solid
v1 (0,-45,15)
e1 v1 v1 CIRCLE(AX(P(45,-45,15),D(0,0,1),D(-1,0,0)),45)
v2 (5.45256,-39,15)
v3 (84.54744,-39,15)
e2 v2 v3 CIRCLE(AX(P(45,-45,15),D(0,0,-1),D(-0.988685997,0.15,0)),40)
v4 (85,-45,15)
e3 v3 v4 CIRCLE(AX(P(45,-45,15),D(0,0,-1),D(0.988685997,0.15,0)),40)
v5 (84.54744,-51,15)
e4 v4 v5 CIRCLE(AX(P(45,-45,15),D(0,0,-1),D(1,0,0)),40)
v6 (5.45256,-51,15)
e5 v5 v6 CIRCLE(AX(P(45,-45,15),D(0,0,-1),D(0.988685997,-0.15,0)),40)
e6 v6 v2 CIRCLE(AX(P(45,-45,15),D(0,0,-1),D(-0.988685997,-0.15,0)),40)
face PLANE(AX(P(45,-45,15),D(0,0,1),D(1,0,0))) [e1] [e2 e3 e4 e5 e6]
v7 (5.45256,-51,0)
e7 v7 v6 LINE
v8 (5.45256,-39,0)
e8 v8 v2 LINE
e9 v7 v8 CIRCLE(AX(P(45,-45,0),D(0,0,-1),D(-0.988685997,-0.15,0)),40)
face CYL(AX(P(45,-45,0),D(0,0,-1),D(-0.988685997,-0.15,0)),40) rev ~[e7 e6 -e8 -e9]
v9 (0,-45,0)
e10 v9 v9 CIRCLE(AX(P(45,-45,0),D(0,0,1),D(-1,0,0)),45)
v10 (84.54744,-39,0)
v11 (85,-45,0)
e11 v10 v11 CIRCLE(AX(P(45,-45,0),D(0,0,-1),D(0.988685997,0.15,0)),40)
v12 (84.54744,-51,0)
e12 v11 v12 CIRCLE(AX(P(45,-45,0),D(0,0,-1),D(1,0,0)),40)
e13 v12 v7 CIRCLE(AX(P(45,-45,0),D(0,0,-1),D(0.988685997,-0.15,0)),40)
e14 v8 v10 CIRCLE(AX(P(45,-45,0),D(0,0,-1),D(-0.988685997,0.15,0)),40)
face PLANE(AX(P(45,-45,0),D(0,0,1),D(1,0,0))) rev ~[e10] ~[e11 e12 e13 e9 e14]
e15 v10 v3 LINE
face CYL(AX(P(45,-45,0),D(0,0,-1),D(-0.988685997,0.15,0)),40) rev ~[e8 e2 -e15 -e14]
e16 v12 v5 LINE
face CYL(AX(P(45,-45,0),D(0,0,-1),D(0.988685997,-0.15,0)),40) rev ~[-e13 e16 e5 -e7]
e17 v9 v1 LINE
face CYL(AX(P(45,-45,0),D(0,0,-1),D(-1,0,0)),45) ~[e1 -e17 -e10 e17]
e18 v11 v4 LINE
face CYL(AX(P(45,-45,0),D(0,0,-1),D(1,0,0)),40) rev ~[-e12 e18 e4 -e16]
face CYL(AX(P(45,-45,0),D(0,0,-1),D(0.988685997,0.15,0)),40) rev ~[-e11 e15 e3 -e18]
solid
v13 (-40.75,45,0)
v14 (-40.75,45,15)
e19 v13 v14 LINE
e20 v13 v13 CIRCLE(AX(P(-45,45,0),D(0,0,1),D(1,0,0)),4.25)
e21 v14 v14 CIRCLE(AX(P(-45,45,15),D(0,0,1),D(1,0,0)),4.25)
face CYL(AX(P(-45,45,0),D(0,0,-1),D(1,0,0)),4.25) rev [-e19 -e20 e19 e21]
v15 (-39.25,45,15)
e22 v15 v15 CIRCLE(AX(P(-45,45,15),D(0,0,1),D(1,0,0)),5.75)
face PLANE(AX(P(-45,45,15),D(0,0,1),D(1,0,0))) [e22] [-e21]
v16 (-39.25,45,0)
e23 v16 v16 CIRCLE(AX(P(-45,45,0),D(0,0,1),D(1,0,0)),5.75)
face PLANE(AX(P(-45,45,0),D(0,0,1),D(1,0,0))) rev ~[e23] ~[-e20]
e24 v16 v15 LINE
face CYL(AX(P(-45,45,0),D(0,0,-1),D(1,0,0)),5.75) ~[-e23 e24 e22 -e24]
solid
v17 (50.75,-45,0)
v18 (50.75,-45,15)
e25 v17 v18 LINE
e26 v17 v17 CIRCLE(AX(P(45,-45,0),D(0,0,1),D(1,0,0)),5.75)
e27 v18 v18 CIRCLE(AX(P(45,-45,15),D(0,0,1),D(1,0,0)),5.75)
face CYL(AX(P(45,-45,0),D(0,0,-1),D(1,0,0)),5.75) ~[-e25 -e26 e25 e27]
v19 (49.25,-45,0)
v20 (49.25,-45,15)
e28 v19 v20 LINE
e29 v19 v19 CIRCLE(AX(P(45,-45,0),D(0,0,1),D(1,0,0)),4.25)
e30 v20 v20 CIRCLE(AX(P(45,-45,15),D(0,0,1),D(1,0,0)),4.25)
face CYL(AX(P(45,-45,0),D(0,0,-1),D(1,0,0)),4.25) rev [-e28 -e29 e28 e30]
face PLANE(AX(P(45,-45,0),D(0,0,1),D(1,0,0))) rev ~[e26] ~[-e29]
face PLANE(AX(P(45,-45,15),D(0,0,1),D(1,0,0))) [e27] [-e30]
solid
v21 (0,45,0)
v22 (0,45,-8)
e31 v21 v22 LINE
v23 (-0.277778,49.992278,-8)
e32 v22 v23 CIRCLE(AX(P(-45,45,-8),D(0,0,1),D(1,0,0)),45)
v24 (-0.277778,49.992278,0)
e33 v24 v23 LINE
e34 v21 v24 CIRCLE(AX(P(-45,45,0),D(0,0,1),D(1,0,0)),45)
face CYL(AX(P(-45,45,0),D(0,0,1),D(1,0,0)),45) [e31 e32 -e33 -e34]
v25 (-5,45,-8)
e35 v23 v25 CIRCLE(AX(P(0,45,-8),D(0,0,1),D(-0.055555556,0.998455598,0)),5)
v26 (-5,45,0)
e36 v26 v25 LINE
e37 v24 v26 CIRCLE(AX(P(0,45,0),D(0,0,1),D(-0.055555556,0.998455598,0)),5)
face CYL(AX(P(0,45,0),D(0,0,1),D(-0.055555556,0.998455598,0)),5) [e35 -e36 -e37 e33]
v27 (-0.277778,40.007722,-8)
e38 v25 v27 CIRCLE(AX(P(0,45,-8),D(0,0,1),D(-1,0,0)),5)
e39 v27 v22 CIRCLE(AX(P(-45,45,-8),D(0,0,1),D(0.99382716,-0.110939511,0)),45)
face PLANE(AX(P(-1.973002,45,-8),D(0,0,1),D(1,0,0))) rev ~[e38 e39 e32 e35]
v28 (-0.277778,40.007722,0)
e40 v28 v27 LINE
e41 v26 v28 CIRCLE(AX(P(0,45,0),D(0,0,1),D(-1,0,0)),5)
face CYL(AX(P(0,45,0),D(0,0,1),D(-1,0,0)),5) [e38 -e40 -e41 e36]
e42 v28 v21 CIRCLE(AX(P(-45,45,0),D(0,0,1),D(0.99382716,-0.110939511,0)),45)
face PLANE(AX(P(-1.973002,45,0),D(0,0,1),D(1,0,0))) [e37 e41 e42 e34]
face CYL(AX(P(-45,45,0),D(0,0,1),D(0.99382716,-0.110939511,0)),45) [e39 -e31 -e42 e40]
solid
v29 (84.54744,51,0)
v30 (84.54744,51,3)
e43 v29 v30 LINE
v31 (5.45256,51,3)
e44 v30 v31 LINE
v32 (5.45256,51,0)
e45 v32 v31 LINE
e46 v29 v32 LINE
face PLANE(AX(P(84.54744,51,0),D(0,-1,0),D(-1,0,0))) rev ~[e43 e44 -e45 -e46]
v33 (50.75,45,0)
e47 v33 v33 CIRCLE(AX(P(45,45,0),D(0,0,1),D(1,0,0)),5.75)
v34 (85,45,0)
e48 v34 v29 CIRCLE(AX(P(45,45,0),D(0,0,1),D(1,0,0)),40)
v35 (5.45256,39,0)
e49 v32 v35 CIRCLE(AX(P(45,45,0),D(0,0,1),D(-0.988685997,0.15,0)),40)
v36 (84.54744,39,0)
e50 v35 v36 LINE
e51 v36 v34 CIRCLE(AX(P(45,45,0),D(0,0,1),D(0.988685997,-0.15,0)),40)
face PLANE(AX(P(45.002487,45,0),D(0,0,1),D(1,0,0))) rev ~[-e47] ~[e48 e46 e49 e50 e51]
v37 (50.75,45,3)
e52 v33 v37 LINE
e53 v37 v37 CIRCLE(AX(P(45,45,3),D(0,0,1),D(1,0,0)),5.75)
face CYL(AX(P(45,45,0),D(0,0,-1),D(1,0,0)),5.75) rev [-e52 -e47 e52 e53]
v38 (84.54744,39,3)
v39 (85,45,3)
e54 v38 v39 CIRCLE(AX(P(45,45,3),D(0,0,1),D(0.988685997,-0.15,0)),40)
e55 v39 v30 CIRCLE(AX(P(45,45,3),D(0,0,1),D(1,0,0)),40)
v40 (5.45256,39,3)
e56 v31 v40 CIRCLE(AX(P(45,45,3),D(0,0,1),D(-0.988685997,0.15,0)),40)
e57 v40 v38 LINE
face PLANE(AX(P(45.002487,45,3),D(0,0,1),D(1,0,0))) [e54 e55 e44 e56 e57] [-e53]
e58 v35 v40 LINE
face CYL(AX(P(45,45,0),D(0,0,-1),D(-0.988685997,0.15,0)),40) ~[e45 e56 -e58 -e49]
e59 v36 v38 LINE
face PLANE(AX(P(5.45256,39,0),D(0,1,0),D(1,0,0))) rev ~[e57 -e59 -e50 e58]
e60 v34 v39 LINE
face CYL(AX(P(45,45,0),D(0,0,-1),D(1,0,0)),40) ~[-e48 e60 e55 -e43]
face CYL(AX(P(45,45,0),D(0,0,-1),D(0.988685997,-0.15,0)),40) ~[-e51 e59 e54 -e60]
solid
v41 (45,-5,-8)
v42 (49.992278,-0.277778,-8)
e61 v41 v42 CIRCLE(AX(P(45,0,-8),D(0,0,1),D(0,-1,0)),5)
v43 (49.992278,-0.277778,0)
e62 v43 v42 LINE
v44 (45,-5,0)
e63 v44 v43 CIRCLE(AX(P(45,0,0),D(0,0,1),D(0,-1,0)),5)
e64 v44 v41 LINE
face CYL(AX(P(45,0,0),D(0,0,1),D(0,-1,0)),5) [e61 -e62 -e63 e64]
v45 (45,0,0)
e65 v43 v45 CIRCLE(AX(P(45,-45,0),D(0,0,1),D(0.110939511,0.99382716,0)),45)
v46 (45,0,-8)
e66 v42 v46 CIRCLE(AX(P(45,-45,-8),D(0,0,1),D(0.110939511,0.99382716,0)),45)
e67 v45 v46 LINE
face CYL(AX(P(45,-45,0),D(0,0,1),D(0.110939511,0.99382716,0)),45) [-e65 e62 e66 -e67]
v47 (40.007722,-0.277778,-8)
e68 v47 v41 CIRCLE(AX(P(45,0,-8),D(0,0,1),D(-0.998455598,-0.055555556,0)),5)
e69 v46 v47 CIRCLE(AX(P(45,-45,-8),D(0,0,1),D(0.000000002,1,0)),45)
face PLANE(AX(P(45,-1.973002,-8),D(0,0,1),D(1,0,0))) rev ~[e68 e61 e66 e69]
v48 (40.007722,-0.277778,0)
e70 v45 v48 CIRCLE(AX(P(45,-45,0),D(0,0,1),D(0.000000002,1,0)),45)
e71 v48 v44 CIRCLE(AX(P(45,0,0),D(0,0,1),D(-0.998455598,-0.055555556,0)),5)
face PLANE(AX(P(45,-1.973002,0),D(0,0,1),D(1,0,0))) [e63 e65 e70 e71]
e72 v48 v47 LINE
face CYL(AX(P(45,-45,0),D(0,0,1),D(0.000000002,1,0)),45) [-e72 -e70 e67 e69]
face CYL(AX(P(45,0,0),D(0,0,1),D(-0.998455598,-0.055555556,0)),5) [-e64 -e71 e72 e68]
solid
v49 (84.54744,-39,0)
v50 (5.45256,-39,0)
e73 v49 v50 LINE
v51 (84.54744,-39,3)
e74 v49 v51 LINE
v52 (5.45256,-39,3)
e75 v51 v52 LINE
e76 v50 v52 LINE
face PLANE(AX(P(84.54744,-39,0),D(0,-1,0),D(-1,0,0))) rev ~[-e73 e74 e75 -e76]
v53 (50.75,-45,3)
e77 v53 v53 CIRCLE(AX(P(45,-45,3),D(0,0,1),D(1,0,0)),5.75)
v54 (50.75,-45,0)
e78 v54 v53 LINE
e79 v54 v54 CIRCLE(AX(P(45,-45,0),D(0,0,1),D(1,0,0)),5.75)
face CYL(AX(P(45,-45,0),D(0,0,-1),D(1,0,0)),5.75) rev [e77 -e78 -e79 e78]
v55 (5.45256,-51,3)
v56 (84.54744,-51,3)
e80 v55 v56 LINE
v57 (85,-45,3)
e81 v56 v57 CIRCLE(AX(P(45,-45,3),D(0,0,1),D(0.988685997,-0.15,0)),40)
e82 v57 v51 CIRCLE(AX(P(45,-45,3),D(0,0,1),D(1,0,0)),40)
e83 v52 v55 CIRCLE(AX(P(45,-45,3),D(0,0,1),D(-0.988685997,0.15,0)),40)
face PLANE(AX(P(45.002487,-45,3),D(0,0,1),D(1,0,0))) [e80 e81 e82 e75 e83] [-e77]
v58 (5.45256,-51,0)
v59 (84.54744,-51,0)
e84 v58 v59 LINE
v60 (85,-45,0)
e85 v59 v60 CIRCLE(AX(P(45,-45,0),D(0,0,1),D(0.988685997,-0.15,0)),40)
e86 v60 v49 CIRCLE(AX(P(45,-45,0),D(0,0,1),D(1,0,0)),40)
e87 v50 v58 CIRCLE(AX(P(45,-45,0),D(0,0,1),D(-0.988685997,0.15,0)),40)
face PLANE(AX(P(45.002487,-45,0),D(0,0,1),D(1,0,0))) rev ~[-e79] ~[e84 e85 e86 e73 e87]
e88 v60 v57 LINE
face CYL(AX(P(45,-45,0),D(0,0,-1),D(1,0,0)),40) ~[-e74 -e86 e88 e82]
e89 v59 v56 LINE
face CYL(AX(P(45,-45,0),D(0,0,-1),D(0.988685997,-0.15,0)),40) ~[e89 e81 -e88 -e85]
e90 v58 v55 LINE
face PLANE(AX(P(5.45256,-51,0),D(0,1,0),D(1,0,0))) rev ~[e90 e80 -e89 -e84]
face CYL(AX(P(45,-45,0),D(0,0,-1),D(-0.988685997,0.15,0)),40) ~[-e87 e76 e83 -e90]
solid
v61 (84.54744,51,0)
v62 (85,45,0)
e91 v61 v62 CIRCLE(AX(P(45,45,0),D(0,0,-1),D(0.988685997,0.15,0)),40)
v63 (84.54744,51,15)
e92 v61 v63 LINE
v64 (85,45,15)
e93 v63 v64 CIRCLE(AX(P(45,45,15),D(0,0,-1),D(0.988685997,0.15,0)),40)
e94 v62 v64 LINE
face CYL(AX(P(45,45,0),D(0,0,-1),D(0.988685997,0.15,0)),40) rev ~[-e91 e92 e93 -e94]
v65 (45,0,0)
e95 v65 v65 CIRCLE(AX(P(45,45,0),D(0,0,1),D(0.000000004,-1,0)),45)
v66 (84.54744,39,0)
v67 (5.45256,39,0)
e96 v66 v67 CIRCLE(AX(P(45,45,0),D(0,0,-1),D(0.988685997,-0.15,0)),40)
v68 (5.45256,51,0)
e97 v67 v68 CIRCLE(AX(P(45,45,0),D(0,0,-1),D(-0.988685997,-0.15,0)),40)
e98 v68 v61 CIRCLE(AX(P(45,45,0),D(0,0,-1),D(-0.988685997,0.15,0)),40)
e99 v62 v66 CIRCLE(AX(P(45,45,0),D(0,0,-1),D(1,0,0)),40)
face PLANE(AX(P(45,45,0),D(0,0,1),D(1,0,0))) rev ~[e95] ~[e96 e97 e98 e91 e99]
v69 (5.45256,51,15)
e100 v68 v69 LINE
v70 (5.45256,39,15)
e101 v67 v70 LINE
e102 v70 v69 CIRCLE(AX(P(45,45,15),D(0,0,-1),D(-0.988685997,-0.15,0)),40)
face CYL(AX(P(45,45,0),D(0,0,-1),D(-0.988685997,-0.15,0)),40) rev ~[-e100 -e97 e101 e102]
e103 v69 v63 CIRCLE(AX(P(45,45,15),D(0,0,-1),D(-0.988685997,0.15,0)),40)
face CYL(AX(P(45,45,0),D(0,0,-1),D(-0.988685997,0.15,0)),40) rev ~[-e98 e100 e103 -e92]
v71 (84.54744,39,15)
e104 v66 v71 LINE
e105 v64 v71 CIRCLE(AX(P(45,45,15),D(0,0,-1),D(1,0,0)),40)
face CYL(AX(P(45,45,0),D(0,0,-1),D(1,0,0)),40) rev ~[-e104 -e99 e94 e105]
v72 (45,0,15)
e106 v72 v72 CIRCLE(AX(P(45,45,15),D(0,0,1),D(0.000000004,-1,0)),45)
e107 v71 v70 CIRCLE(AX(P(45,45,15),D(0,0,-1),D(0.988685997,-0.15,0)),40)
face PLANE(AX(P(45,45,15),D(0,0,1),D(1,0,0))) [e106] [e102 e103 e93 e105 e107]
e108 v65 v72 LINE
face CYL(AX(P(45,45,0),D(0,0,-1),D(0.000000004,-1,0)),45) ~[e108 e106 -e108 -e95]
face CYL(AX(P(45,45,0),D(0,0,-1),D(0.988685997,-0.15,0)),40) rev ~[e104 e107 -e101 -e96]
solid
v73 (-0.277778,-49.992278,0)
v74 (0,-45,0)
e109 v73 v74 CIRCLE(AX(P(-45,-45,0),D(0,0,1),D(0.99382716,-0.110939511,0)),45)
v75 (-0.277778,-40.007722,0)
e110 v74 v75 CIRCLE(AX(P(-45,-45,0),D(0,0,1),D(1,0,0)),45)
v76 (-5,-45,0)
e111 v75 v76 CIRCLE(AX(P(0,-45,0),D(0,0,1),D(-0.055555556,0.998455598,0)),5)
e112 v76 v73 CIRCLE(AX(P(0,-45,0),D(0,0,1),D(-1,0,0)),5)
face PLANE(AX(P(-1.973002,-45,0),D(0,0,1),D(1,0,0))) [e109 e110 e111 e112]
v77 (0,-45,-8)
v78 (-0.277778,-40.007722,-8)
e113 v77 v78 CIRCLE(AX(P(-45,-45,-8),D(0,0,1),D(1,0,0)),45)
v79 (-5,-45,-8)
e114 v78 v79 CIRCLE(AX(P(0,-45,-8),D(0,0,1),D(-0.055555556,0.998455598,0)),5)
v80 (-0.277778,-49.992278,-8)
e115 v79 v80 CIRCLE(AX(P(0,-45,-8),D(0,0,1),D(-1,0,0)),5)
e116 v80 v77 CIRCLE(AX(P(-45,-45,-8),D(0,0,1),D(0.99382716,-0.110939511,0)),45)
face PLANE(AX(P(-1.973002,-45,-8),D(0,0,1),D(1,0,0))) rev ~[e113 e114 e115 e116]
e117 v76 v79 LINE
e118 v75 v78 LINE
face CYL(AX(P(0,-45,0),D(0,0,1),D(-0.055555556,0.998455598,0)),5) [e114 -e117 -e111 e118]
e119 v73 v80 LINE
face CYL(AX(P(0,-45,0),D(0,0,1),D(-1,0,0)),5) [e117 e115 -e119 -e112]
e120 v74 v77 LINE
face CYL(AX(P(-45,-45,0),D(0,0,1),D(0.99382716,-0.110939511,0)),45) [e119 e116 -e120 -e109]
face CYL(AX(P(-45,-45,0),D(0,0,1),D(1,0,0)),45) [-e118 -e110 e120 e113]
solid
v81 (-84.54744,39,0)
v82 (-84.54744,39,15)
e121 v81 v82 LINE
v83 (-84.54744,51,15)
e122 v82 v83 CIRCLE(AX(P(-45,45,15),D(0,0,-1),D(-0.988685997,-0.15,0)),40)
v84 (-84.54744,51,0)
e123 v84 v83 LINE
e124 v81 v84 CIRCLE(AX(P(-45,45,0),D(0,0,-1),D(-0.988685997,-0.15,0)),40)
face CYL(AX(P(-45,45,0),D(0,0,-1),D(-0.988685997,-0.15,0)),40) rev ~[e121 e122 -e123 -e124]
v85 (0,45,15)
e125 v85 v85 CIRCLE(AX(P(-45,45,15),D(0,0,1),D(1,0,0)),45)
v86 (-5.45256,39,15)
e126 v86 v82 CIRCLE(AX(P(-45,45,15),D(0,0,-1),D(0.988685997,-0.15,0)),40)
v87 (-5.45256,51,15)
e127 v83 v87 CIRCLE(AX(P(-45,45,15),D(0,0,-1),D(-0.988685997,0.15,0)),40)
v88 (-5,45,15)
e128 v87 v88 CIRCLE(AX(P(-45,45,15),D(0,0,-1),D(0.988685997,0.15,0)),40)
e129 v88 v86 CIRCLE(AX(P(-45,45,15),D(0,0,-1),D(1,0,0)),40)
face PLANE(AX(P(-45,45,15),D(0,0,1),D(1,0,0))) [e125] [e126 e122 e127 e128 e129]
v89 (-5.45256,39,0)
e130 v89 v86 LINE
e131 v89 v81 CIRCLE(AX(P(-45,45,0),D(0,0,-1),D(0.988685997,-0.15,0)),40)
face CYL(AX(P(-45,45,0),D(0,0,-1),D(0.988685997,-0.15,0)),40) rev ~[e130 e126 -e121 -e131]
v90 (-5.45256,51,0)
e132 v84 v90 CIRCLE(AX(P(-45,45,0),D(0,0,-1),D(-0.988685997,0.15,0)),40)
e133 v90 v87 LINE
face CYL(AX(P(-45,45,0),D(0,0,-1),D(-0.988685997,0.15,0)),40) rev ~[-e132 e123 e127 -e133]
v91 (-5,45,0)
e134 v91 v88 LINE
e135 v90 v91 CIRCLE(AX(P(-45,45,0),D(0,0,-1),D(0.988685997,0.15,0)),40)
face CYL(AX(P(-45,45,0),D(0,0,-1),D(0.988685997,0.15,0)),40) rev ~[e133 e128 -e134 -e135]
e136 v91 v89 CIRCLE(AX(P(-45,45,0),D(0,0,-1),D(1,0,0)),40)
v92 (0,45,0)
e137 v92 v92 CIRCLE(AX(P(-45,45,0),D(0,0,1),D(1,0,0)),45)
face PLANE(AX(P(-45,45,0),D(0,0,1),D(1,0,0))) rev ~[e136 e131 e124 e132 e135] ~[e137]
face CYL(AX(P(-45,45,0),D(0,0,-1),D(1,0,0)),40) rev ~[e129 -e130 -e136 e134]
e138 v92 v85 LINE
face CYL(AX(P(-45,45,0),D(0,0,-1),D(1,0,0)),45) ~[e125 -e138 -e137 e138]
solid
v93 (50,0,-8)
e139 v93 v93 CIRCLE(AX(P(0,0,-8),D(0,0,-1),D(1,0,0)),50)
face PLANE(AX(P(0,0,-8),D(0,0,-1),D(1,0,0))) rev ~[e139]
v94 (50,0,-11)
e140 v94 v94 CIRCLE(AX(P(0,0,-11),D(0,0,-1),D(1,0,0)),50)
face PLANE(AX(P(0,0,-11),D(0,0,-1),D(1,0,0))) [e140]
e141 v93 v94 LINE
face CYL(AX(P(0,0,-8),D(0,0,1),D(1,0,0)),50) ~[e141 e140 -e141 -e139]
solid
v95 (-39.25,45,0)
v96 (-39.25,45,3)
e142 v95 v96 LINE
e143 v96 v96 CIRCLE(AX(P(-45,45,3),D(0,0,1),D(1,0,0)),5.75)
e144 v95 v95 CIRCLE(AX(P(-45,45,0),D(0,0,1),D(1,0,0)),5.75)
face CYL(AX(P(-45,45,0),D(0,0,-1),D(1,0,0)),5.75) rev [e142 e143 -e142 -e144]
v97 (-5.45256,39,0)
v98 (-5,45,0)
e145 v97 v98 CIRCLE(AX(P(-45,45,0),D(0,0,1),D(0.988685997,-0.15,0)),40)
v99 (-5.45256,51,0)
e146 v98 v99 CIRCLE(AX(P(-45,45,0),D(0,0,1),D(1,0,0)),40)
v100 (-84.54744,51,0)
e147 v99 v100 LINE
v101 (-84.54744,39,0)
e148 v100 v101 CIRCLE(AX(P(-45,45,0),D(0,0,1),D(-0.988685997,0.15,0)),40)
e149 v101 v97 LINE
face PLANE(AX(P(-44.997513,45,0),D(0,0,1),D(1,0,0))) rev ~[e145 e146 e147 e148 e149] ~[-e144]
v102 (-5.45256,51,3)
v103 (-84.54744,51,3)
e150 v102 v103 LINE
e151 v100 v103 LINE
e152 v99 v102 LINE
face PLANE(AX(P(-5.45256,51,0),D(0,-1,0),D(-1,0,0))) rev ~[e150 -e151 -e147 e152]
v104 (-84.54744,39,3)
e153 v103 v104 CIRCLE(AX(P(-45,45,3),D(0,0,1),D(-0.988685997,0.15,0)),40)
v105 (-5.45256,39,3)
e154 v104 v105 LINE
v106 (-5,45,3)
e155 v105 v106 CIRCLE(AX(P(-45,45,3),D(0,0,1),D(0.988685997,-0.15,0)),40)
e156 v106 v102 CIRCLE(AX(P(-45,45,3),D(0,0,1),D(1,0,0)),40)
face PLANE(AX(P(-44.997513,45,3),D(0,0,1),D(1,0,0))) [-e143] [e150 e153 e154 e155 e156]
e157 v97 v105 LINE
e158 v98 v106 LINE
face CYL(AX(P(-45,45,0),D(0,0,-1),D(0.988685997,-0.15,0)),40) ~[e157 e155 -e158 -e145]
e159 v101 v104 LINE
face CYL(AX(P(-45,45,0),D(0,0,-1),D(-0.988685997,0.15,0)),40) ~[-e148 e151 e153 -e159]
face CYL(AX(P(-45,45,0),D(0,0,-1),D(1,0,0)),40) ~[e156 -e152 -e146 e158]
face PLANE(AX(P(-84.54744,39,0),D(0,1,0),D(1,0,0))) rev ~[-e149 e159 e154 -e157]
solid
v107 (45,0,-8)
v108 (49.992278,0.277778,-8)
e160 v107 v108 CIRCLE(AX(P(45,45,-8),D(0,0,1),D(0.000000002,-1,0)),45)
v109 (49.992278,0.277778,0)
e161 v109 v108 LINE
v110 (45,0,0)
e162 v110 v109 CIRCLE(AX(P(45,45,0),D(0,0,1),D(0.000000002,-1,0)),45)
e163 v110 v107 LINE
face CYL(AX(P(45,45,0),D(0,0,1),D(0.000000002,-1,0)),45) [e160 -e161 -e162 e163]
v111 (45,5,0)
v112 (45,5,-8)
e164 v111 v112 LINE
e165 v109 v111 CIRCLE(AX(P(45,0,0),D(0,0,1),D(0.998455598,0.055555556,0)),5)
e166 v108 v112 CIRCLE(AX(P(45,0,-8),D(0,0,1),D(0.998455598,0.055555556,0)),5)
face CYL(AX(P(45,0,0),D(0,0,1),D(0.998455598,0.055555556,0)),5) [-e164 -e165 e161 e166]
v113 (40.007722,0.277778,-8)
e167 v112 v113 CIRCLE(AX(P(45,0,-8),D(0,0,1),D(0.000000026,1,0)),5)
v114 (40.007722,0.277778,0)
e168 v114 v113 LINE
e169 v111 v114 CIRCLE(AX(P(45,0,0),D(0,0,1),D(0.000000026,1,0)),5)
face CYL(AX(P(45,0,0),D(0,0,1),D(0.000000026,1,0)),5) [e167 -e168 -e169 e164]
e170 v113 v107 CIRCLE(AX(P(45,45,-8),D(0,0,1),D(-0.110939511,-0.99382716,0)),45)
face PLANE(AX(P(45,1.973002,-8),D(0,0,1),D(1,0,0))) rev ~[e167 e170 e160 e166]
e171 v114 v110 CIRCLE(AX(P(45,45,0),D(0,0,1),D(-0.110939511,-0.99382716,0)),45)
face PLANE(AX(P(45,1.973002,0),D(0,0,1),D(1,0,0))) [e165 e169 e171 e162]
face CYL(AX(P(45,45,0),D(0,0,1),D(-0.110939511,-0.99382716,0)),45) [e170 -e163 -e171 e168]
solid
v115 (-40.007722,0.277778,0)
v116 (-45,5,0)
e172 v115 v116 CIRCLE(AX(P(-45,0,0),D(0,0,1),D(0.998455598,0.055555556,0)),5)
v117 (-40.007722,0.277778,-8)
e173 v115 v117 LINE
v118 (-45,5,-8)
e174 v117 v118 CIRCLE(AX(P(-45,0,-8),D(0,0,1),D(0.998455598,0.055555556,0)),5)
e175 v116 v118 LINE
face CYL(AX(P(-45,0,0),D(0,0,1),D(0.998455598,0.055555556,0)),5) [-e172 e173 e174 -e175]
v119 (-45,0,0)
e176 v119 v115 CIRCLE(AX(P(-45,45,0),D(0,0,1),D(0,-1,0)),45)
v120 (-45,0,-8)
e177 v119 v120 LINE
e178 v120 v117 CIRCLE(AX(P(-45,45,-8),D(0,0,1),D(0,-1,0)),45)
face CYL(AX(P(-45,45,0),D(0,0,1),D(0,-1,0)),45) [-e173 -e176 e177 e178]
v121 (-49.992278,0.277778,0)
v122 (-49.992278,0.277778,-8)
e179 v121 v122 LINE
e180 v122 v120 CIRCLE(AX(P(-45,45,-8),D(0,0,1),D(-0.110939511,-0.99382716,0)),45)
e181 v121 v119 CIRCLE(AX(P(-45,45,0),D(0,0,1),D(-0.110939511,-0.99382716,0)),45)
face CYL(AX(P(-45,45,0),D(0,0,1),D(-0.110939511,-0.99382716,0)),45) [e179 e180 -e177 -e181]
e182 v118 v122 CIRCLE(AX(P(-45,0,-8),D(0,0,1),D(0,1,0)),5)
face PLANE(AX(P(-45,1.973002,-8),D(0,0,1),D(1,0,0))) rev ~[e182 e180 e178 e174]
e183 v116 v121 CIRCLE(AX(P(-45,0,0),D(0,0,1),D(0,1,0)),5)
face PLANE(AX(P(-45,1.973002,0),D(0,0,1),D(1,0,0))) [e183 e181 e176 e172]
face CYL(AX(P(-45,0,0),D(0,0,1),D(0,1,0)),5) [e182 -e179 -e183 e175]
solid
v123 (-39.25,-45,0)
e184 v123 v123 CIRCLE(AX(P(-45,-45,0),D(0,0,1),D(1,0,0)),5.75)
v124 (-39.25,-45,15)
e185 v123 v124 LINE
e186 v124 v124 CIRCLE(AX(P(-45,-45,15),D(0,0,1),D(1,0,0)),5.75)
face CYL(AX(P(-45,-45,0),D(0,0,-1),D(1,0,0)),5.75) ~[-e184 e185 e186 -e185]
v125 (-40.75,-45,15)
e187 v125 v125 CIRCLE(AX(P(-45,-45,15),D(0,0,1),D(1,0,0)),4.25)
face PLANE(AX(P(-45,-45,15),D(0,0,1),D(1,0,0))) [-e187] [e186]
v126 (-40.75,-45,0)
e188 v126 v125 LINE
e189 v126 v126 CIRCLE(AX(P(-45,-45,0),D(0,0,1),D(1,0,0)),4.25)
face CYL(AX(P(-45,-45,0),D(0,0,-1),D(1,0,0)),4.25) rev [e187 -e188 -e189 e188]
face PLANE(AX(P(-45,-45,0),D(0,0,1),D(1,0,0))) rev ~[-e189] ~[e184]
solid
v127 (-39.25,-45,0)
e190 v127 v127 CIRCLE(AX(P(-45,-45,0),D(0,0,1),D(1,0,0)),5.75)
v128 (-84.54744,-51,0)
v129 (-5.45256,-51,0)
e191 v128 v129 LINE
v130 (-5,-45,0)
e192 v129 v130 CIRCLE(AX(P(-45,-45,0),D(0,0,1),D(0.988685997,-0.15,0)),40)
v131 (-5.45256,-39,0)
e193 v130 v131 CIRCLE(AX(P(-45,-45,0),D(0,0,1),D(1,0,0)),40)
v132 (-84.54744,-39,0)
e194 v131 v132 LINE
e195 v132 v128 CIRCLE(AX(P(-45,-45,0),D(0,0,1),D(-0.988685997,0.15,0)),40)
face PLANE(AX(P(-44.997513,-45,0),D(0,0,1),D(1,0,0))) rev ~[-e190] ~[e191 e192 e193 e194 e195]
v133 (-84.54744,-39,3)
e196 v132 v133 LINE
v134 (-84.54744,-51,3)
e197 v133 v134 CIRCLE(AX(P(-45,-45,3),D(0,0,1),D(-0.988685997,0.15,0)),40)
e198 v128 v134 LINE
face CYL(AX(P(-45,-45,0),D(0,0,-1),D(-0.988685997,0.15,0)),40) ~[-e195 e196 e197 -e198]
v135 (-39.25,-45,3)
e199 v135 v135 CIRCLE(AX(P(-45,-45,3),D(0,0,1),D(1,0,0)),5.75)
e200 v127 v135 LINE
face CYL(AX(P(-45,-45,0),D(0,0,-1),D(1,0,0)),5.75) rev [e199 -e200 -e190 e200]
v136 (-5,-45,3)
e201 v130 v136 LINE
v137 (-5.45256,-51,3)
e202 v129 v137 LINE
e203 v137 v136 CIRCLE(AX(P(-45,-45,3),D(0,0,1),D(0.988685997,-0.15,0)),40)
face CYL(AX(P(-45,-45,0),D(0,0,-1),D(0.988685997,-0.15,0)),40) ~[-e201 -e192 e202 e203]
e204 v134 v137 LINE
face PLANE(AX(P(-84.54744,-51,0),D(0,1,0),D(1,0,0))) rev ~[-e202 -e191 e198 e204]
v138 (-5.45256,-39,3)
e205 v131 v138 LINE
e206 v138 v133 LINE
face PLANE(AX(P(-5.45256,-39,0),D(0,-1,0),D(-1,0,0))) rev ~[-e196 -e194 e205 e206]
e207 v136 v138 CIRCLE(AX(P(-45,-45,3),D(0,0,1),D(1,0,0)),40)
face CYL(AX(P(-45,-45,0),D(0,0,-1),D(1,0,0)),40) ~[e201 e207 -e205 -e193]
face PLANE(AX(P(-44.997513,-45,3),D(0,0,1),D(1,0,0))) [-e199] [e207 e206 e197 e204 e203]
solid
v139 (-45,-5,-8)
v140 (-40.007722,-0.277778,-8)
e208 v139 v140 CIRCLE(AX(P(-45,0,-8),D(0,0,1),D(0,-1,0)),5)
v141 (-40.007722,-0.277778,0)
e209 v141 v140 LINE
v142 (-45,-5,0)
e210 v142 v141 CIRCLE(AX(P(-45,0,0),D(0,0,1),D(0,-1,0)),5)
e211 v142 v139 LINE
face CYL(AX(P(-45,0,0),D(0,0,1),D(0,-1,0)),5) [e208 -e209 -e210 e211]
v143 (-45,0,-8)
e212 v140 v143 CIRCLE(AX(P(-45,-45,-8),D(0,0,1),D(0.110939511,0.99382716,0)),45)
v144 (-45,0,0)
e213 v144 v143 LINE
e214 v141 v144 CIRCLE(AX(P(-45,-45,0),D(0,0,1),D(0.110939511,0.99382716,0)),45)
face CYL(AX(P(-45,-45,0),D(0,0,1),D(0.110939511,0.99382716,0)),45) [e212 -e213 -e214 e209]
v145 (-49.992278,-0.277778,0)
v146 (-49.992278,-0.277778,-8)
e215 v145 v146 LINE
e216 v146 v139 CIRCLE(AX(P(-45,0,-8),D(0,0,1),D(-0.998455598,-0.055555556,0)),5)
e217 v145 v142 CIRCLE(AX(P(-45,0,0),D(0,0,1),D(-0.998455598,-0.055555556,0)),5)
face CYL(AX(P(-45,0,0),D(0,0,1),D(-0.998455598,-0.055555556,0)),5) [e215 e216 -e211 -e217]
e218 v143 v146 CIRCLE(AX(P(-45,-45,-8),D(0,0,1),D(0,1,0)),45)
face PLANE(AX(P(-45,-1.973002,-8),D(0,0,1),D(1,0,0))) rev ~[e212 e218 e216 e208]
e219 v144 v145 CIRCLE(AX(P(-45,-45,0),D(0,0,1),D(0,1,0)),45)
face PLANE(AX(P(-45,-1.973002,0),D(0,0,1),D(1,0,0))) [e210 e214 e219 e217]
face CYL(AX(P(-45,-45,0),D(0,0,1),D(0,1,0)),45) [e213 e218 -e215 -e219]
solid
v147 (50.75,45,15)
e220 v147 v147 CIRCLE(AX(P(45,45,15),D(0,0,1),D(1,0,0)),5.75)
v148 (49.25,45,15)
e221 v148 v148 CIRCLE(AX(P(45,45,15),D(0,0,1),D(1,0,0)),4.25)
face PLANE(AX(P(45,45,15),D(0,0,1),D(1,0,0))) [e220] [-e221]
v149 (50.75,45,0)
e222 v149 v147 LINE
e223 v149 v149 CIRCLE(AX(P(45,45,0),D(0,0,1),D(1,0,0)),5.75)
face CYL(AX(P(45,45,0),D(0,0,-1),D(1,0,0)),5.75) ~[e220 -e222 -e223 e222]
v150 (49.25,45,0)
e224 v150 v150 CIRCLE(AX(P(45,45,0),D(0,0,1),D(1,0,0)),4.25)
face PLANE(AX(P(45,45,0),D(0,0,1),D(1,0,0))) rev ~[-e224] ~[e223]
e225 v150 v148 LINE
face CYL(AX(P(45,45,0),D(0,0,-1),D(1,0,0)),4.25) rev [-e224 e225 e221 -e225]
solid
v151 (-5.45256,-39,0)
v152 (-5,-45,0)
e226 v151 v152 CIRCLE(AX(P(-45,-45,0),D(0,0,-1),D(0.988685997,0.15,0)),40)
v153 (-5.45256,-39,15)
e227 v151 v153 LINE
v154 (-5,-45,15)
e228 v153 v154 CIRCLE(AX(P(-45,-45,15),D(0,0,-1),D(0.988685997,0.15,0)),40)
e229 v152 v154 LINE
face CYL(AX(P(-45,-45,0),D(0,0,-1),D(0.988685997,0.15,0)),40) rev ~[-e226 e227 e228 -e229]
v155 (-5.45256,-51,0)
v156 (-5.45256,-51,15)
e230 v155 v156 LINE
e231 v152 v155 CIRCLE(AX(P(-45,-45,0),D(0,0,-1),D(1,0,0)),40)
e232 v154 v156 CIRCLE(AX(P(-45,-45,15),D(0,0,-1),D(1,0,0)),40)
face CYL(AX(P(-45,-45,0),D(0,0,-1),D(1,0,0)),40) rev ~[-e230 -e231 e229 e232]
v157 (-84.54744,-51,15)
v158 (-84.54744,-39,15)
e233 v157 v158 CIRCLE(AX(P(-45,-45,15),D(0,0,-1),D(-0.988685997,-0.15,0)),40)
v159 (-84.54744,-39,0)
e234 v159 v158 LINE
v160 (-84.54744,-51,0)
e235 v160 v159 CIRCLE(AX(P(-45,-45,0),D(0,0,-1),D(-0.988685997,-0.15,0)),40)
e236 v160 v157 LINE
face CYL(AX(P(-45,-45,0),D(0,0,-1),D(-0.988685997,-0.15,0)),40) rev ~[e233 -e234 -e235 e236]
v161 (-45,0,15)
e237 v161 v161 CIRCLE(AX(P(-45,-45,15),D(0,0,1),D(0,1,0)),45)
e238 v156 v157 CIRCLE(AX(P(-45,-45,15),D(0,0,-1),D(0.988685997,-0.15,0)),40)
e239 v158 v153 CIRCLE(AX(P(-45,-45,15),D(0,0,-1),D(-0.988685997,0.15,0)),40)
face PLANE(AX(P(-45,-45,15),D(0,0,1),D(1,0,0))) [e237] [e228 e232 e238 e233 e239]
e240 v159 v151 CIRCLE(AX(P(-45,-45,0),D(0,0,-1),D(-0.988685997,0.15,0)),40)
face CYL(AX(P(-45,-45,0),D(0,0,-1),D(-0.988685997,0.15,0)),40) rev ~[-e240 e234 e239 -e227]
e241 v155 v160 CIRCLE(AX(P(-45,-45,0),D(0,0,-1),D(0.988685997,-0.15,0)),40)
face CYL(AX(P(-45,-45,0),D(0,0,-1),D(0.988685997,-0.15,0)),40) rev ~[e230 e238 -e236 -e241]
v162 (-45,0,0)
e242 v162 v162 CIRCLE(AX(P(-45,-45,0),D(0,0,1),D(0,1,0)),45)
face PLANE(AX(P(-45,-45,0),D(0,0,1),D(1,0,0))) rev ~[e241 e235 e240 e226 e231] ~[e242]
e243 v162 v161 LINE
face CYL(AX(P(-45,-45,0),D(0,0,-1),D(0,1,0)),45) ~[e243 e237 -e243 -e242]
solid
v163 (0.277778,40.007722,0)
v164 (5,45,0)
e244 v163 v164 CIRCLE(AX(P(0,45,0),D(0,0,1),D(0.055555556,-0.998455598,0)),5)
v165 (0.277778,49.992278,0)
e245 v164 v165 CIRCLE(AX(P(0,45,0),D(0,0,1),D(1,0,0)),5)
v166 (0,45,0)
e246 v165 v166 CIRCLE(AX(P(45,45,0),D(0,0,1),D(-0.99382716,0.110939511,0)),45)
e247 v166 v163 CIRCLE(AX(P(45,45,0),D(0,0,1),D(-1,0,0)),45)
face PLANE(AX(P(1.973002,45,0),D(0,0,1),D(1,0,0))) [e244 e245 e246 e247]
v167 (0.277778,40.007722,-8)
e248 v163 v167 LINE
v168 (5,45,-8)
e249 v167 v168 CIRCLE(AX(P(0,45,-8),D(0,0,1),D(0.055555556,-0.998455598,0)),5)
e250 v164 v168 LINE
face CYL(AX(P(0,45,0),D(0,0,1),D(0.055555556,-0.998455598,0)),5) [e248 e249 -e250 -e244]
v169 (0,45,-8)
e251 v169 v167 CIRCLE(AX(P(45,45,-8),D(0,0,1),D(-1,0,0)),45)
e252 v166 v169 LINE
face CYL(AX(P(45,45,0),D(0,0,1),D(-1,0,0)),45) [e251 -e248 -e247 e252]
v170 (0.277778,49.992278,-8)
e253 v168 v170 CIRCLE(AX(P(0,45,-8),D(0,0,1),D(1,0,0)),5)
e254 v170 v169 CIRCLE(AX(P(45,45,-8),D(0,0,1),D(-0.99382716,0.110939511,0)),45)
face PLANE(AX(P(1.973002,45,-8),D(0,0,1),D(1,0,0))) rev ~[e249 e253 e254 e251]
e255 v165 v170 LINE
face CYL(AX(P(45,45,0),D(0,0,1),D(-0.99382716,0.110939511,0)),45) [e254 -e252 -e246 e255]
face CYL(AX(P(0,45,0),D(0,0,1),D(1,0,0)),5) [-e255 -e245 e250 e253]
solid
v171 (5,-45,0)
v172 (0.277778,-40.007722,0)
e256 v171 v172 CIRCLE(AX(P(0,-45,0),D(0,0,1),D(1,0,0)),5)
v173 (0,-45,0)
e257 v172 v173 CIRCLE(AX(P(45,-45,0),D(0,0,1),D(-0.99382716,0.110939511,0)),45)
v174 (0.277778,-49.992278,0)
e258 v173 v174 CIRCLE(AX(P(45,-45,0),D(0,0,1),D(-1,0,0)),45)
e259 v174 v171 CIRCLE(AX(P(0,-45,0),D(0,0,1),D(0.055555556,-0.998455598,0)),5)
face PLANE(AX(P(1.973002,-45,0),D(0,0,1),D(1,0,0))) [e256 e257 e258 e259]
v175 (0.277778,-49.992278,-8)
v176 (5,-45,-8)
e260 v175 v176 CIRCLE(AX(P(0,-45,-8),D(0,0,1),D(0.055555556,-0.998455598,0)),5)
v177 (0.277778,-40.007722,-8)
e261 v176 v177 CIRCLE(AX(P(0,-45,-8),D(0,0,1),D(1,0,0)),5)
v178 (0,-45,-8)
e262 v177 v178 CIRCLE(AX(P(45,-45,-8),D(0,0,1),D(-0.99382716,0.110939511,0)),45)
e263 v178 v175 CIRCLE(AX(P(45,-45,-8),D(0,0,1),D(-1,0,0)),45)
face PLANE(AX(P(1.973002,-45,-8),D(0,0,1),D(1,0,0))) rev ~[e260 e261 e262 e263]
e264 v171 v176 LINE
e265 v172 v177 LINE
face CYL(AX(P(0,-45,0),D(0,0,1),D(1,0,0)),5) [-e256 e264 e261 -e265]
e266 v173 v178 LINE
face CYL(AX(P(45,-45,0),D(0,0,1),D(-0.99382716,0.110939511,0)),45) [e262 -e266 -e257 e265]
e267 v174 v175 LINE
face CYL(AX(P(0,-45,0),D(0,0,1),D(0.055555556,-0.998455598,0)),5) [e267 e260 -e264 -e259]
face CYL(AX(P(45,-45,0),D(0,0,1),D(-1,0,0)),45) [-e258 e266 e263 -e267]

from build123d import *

# Parameters (mm, degrees)
F1_DEPTH = 15
F0_R     = 5.75
F2_DEPTH = 3
F0_R_2   = 4.25
F3_DEPTH = 15
F5_DEPTH = 8
F6_R     = 50
F7_DEPTH = 3


# Not quite as in the source:
# - a feature names something its author has since deleted; it is built from what else it names


with BuildPart() as f1:
    # F0 (on Top) → F1 (new body)
    with BuildSketch(Plane.XY):
        with BuildLine():
            ThreePointArc((-45, 0), (-13.1801948466, 13.1801948466), (0, 45))
            ThreePointArc((0, 45), (-76.8198051534, 76.8198051534), (-45, 0))
        make_face()
        with BuildLine():
            ThreePointArc((-5.4525601334, 51), (-5.1133004959, 48.0085216749), (-5, 45))
            ThreePointArc((-5, 45), (-5.1133004959, 41.9914783251), (-5.4525601334, 39))
            ThreePointArc((-5.4525601334, 39), (-45, 5), (-84.5474398666, 39))
            ThreePointArc((-84.5474398666, 39), (-85, 45), (-84.5474398666, 51))
            ThreePointArc((-84.5474398666, 51), (-45, 85), (-5.4525601334, 51))
        make_face(mode=Mode.SUBTRACT)
    extrude(amount=F1_DEPTH)


with BuildPart() as f1b:
    # F0 (on Top) → F1, piece 2 (new body)
    with BuildSketch(Plane.XY):
        with BuildLine():
            ThreePointArc((90, 45), (45, 90), (0, 45))
            ThreePointArc((0, 45), (13.1801949066, 13.1801947866), (45.0000001696, 0))
            ThreePointArc((45.0000001696, 0), (76.8198052134, 13.1801949066), (90, 45))
        make_face()
        with BuildLine():
            ThreePointArc((84.5474398666, 51), (84.8866995041, 48.0085216749), (85, 45))
            ThreePointArc((85, 45), (84.8866995041, 41.9914783251), (84.5474398666, 39))
            ThreePointArc((84.5474398666, 39), (45, 5), (5.4525601334, 39))
            ThreePointArc((5.4525601334, 39), (5, 45), (5.4525601334, 51))
            ThreePointArc((5.4525601334, 51), (45, 85), (84.5474398666, 51))
        make_face(mode=Mode.SUBTRACT)
    extrude(amount=F1_DEPTH)


with BuildPart() as f1c:
    # F0 (on Top) → F1, piece 3 (new body)
    with BuildSketch(Plane.XY):
        with BuildLine():
            ThreePointArc((0, -45), (-13.1801948466, -13.1801948466), (-45, 0))
            ThreePointArc((-45, 0), (-76.8198051534, -76.8198051534), (0, -45))
        make_face()
        with BuildLine():
            ThreePointArc((-5.4525601334, -39), (-5.1133004959, -41.9914783251), (-5, -45))
            ThreePointArc((-5, -45), (-5.1133004959, -48.0085216749), (-5.4525601334, -51))
            ThreePointArc((-5.4525601334, -51), (-45, -85), (-84.5474398666, -51))
            ThreePointArc((-84.5474398666, -51), (-85, -45), (-84.5474398666, -39))
            ThreePointArc((-84.5474398666, -39), (-45, -5), (-5.4525601334, -39))
        make_face(mode=Mode.SUBTRACT)
    extrude(amount=F1_DEPTH)


with BuildPart() as f1d:
    # F0 (on Top) → F1, piece 4 (new body)
    with BuildSketch(Plane.XY):
        with BuildLine():
            ThreePointArc((90, -45), (76.8198052134, -13.1801949066), (45.0000001696, 0))
            ThreePointArc((45.0000001696, 0), (13.1801949066, -13.1801947866), (0, -45))
            ThreePointArc((0, -45), (45, -90), (90, -45))
        make_face()
        with BuildLine():
            ThreePointArc((84.5474398666, -39), (84.8866995041, -41.9914783251), (85, -45))
            ThreePointArc((85, -45), (84.8866995041, -48.0085216749), (84.5474398666, -51))
            ThreePointArc((84.5474398666, -51), (45, -85), (5.4525601334, -51))
            ThreePointArc((5.4525601334, -51), (5, -45), (5.4525601334, -39))
            ThreePointArc((5.4525601334, -39), (45, -5), (84.5474398666, -39))
        make_face(mode=Mode.SUBTRACT)
    extrude(amount=F1_DEPTH)


with BuildPart() as f2:
    # F0 (on Top) → F2 (new body)
    with BuildSketch(Plane.XY):
        with BuildLine():
            ThreePointArc((84.5474398666, -51), (84.8866995041, -48.0085216749), (85, -45))
            ThreePointArc((85, -45), (84.8866995041, -41.9914783251), (84.5474398666, -39))
            Line((84.5474398666, -39), (5.4525601334, -39))
            ThreePointArc((5.4525601334, -39), (5, -45), (5.4525601334, -51))
            Line((5.4525601334, -51), (84.5474398666, -51))
        make_face()
        with Locations((45, -45)):
            Circle(F0_R, mode=Mode.SUBTRACT)
    extrude(amount=F2_DEPTH)


with BuildPart() as f2b:
    # F0 (on Top) → F2, piece 2 (new body)
    with BuildSketch(Plane.XY):
        with BuildLine():
            ThreePointArc((84.5474398666, 39), (84.8866995041, 41.9914783251), (85, 45))
            ThreePointArc((85, 45), (84.8866995041, 48.0085216749), (84.5474398666, 51))
            Line((84.5474398666, 51), (5.4525601334, 51))
            ThreePointArc((5.4525601334, 51), (5, 45), (5.4525601334, 39))
            Line((5.4525601334, 39), (84.5474398666, 39))
        make_face()
        with Locations((45, 45)):
            Circle(F0_R, mode=Mode.SUBTRACT)
    extrude(amount=F2_DEPTH)


with BuildPart() as f2c:
    # F0 (on Top) → F2, piece 3 (new body)
    with BuildSketch(Plane.XY):
        with BuildLine():
            ThreePointArc((-5.4525601334, 39), (-5.1133004959, 41.9914783251), (-5, 45))
            ThreePointArc((-5, 45), (-5.1133004959, 48.0085216749), (-5.4525601334, 51))
            Line((-5.4525601334, 51), (-84.5474398666, 51))
            ThreePointArc((-84.5474398666, 51), (-85, 45), (-84.5474398666, 39))
            Line((-84.5474398666, 39), (-5.4525601334, 39))
        make_face()
        with Locations((-45, 45)):
            Circle(F0_R, mode=Mode.SUBTRACT)
    extrude(amount=F2_DEPTH)


with BuildPart() as f2d:
    # F0 (on Top) → F2, piece 4 (new body)
    with BuildSketch(Plane.XY):
        with BuildLine():
            ThreePointArc((-5.4525601334, -51), (-5.1133004959, -48.0085216749), (-5, -45))
            ThreePointArc((-5, -45), (-5.1133004959, -41.9914783251), (-5.4525601334, -39))
            Line((-5.4525601334, -39), (-84.5474398666, -39))
            ThreePointArc((-84.5474398666, -39), (-85, -45), (-84.5474398666, -51))
            Line((-84.5474398666, -51), (-5.4525601334, -51))
        make_face()
        with Locations((-45, -45)):
            Circle(F0_R, mode=Mode.SUBTRACT)
    extrude(amount=F2_DEPTH)


with BuildPart() as f3:
    # F0 (on Top) → F3 (new body)
    with BuildSketch(Plane.XY):
        with Locations((-45, 45)):
            Circle(F0_R)
        with Locations((-45, 45)):
            Circle(F0_R_2, mode=Mode.SUBTRACT)
    extrude(amount=F3_DEPTH)


with BuildPart() as f3b:
    # F0 (on Top) → F3, piece 2 (new body)
    with BuildSketch(Plane.XY):
        with Locations((45, 45)):
            Circle(F0_R)
        with Locations((45, 45)):
            Circle(F0_R_2, mode=Mode.SUBTRACT)
    extrude(amount=F3_DEPTH)


with BuildPart() as f3c:
    # F0 (on Top) → F3, piece 3 (new body)
    with BuildSketch(Plane.XY):
        with Locations((-45, -45)):
            Circle(F0_R)
        with Locations((-45, -45)):
            Circle(F0_R_2, mode=Mode.SUBTRACT)
    extrude(amount=F3_DEPTH)


with BuildPart() as f3d:
    # F0 (on Top) → F3, piece 4 (new body)
    with BuildSketch(Plane.XY):
        with Locations((45, -45)):
            Circle(F0_R)
        with Locations((45, -45)):
            Circle(F0_R_2, mode=Mode.SUBTRACT)
    extrude(amount=F3_DEPTH)


with BuildPart() as f5:
    # F4 (on Top) → F5 (new body)
    with BuildSketch(Plane.XY):
        with BuildLine():
            ThreePointArc((-0.2777777778, -49.9922779877), (-0.069498111, -47.5), (0, -45))
            ThreePointArc((0, -45), (-0.069498111, -42.5), (-0.2777777778, -40.0077220123))
            ThreePointArc((-0.2777777778, -40.0077220123), (-3.6324157863, -41.5640786453), (-5, -45))
            ThreePointArc((-5, -45), (-3.6324157863, -48.4359213547), (-0.2777777778, -49.9922779877))
        make_face()
    extrude(amount=-F5_DEPTH)


with BuildPart() as f5b:
    # F4 (on Top) → F5, piece 2 (new body)
    with BuildSketch(Plane.XY):
        with BuildLine():
            ThreePointArc((0.2777777778, -40.0077220123), (0.069498111, -42.5), (0, -45))
            ThreePointArc((0, -45), (0.069498111, -47.5), (0.2777777778, -49.9922779877))
            ThreePointArc((0.2777777778, -49.9922779877), (3.6324157863, -48.4359213547), (5, -45))
            ThreePointArc((5, -45), (3.6324157863, -41.5640786453), (0.2777777778, -40.0077220123))
        make_face()
    extrude(amount=-F5_DEPTH)


with BuildPart() as f5c:
    # F4 (on Top) → F5, piece 3 (new body)
    with BuildSketch(Plane.XY):
        with BuildLine():
            ThreePointArc((-45, -5), (-41.5640786453, -3.6324157863), (-40.0077220123, -0.2777777778))
            ThreePointArc((-40.0077220123, -0.2777777778), (-42.4999999989, -0.069498111), (-44.9999999978, 0))
            ThreePointArc((-44.9999999978, 0), (-47.4999999989, -0.0694981109), (-49.9922779877, -0.2777777778))
            ThreePointArc((-49.9922779877, -0.2777777778), (-48.4359213547, -3.6324157863), (-45, -5))
        make_face()
    extrude(amount=-F5_DEPTH)


with BuildPart() as f5d:
    # F4 (on Top) → F5, piece 4 (new body)
    with BuildSketch(Plane.XY):
        with BuildLine():
            ThreePointArc((45.0000000896, 0), (42.5000000447, -0.0694981085), (40.0077220123, -0.2777777778))
            ThreePointArc((40.0077220123, -0.2777777778), (41.5640786453, -3.6324157863), (45, -5))
            ThreePointArc((45, -5), (48.4359213547, -3.6324157863), (49.9922779877, -0.2777777778))
            ThreePointArc((49.9922779877, -0.2777777778), (47.5000000447, -0.0694981135), (45.0000000896, 0))
        make_face()
    extrude(amount=-F5_DEPTH)


with BuildPart() as f5e:
    # F4 (on Top) → F5, piece 5 (new body)
    with BuildSketch(Plane.XY):
        with BuildLine():
            ThreePointArc((-49.9922779877, 0.2777777778), (-47.4999999989, 0.0694981109), (-44.9999999978, 0))
            ThreePointArc((-44.9999999978, 0), (-42.4999999989, 0.069498111), (-40.0077220123, 0.2777777778))
            ThreePointArc((-40.0077220123, 0.2777777778), (-41.5640786453, 3.6324157863), (-45, 5))
            ThreePointArc((-45, 5), (-48.4359213547, 3.6324157863), (-49.9922779877, 0.2777777778))
        make_face()
    extrude(amount=-F5_DEPTH)


with BuildPart() as f5f:
    # F4 (on Top) → F5, piece 6 (new body)
    with BuildSketch(Plane.XY):
        with BuildLine():
            ThreePointArc((40.0077220123, 0.2777777778), (42.5000000447, 0.0694981085), (45.0000000896, 0))
            ThreePointArc((45.0000000896, 0), (47.5000000447, 0.0694981135), (49.9922779877, 0.2777777778))
            ThreePointArc((49.9922779877, 0.2777777778), (48.4359214017, 3.6324157418), (45.0000001294, 5))
            ThreePointArc((45.0000001294, 5), (41.5640786923, 3.6324158307), (40.0077220123, 0.2777777778))
        make_face()
    extrude(amount=-F5_DEPTH)


with BuildPart() as f5g:
    # F4 (on Top) → F5, piece 7 (new body)
    with BuildSketch(Plane.XY):
        with BuildLine():
            ThreePointArc((0, 45), (-0.069498111, 47.5), (-0.2777777778, 49.9922779877))
            ThreePointArc((-0.2777777778, 49.9922779877), (-3.6324157863, 48.4359213547), (-5, 45))
            ThreePointArc((-5, 45), (-3.6324157863, 41.5640786453), (-0.2777777778, 40.0077220123))
            ThreePointArc((-0.2777777778, 40.0077220123), (-0.069498111, 42.5), (0, 45))
        make_face()
    extrude(amount=-F5_DEPTH)


with BuildPart() as f5h:
    # F4 (on Top) → F5, piece 8 (new body)
    with BuildSketch(Plane.XY):
        with BuildLine():
            ThreePointArc((0, 45), (0.069498111, 42.5), (0.2777777778, 40.0077220123))
            ThreePointArc((0.2777777778, 40.0077220123), (3.6324157863, 41.5640786453), (5, 45))
            ThreePointArc((5, 45), (3.6324157863, 48.4359213547), (0.2777777778, 49.9922779877))
            ThreePointArc((0.2777777778, 49.9922779877), (0.069498111, 47.5), (0, 45))
        make_face()
    extrude(amount=-F5_DEPTH)


with BuildPart() as f7:
    # F6 (on face) → F7 (new body)
    with BuildSketch(Plane(origin=(0, 0, -8), x_dir=(1, 0, 0), z_dir=(0, 0, -1))):
        Circle(F6_R)
        with BuildLine():
            ThreePointArc((-40.0077220123, -0.2777777778), (-45, -5), (-49.9922779877, -0.2777777778))
            ThreePointArc((-49.9922779877, -0.2777777778), (-45, 0), (-40.0077220123, -0.2777777778))
        make_face(mode=Mode.SUBTRACT)
        with BuildLine():
            ThreePointArc((-40.0077220123, -0.2777777778), (-45, 0), (-49.9922779877, -0.2777777778))
            ThreePointArc((-49.9922779877, -0.2777777778), (-45, -5), (-40.0077220123, -0.2777777778))
        make_face()
    extrude(amount=F7_DEPTH)


solid = Compound([f1.part, f1b.part, f1c.part, f1d.part, f2.part, f2b.part, f2c.part, f2d.part, f3.part, f3b.part, f3c.part, f3d.part, f5.part, f5b.part, f5c.part, f5d.part, f5e.part, f5f.part, f5g.part, f5h.part, f7.part])
